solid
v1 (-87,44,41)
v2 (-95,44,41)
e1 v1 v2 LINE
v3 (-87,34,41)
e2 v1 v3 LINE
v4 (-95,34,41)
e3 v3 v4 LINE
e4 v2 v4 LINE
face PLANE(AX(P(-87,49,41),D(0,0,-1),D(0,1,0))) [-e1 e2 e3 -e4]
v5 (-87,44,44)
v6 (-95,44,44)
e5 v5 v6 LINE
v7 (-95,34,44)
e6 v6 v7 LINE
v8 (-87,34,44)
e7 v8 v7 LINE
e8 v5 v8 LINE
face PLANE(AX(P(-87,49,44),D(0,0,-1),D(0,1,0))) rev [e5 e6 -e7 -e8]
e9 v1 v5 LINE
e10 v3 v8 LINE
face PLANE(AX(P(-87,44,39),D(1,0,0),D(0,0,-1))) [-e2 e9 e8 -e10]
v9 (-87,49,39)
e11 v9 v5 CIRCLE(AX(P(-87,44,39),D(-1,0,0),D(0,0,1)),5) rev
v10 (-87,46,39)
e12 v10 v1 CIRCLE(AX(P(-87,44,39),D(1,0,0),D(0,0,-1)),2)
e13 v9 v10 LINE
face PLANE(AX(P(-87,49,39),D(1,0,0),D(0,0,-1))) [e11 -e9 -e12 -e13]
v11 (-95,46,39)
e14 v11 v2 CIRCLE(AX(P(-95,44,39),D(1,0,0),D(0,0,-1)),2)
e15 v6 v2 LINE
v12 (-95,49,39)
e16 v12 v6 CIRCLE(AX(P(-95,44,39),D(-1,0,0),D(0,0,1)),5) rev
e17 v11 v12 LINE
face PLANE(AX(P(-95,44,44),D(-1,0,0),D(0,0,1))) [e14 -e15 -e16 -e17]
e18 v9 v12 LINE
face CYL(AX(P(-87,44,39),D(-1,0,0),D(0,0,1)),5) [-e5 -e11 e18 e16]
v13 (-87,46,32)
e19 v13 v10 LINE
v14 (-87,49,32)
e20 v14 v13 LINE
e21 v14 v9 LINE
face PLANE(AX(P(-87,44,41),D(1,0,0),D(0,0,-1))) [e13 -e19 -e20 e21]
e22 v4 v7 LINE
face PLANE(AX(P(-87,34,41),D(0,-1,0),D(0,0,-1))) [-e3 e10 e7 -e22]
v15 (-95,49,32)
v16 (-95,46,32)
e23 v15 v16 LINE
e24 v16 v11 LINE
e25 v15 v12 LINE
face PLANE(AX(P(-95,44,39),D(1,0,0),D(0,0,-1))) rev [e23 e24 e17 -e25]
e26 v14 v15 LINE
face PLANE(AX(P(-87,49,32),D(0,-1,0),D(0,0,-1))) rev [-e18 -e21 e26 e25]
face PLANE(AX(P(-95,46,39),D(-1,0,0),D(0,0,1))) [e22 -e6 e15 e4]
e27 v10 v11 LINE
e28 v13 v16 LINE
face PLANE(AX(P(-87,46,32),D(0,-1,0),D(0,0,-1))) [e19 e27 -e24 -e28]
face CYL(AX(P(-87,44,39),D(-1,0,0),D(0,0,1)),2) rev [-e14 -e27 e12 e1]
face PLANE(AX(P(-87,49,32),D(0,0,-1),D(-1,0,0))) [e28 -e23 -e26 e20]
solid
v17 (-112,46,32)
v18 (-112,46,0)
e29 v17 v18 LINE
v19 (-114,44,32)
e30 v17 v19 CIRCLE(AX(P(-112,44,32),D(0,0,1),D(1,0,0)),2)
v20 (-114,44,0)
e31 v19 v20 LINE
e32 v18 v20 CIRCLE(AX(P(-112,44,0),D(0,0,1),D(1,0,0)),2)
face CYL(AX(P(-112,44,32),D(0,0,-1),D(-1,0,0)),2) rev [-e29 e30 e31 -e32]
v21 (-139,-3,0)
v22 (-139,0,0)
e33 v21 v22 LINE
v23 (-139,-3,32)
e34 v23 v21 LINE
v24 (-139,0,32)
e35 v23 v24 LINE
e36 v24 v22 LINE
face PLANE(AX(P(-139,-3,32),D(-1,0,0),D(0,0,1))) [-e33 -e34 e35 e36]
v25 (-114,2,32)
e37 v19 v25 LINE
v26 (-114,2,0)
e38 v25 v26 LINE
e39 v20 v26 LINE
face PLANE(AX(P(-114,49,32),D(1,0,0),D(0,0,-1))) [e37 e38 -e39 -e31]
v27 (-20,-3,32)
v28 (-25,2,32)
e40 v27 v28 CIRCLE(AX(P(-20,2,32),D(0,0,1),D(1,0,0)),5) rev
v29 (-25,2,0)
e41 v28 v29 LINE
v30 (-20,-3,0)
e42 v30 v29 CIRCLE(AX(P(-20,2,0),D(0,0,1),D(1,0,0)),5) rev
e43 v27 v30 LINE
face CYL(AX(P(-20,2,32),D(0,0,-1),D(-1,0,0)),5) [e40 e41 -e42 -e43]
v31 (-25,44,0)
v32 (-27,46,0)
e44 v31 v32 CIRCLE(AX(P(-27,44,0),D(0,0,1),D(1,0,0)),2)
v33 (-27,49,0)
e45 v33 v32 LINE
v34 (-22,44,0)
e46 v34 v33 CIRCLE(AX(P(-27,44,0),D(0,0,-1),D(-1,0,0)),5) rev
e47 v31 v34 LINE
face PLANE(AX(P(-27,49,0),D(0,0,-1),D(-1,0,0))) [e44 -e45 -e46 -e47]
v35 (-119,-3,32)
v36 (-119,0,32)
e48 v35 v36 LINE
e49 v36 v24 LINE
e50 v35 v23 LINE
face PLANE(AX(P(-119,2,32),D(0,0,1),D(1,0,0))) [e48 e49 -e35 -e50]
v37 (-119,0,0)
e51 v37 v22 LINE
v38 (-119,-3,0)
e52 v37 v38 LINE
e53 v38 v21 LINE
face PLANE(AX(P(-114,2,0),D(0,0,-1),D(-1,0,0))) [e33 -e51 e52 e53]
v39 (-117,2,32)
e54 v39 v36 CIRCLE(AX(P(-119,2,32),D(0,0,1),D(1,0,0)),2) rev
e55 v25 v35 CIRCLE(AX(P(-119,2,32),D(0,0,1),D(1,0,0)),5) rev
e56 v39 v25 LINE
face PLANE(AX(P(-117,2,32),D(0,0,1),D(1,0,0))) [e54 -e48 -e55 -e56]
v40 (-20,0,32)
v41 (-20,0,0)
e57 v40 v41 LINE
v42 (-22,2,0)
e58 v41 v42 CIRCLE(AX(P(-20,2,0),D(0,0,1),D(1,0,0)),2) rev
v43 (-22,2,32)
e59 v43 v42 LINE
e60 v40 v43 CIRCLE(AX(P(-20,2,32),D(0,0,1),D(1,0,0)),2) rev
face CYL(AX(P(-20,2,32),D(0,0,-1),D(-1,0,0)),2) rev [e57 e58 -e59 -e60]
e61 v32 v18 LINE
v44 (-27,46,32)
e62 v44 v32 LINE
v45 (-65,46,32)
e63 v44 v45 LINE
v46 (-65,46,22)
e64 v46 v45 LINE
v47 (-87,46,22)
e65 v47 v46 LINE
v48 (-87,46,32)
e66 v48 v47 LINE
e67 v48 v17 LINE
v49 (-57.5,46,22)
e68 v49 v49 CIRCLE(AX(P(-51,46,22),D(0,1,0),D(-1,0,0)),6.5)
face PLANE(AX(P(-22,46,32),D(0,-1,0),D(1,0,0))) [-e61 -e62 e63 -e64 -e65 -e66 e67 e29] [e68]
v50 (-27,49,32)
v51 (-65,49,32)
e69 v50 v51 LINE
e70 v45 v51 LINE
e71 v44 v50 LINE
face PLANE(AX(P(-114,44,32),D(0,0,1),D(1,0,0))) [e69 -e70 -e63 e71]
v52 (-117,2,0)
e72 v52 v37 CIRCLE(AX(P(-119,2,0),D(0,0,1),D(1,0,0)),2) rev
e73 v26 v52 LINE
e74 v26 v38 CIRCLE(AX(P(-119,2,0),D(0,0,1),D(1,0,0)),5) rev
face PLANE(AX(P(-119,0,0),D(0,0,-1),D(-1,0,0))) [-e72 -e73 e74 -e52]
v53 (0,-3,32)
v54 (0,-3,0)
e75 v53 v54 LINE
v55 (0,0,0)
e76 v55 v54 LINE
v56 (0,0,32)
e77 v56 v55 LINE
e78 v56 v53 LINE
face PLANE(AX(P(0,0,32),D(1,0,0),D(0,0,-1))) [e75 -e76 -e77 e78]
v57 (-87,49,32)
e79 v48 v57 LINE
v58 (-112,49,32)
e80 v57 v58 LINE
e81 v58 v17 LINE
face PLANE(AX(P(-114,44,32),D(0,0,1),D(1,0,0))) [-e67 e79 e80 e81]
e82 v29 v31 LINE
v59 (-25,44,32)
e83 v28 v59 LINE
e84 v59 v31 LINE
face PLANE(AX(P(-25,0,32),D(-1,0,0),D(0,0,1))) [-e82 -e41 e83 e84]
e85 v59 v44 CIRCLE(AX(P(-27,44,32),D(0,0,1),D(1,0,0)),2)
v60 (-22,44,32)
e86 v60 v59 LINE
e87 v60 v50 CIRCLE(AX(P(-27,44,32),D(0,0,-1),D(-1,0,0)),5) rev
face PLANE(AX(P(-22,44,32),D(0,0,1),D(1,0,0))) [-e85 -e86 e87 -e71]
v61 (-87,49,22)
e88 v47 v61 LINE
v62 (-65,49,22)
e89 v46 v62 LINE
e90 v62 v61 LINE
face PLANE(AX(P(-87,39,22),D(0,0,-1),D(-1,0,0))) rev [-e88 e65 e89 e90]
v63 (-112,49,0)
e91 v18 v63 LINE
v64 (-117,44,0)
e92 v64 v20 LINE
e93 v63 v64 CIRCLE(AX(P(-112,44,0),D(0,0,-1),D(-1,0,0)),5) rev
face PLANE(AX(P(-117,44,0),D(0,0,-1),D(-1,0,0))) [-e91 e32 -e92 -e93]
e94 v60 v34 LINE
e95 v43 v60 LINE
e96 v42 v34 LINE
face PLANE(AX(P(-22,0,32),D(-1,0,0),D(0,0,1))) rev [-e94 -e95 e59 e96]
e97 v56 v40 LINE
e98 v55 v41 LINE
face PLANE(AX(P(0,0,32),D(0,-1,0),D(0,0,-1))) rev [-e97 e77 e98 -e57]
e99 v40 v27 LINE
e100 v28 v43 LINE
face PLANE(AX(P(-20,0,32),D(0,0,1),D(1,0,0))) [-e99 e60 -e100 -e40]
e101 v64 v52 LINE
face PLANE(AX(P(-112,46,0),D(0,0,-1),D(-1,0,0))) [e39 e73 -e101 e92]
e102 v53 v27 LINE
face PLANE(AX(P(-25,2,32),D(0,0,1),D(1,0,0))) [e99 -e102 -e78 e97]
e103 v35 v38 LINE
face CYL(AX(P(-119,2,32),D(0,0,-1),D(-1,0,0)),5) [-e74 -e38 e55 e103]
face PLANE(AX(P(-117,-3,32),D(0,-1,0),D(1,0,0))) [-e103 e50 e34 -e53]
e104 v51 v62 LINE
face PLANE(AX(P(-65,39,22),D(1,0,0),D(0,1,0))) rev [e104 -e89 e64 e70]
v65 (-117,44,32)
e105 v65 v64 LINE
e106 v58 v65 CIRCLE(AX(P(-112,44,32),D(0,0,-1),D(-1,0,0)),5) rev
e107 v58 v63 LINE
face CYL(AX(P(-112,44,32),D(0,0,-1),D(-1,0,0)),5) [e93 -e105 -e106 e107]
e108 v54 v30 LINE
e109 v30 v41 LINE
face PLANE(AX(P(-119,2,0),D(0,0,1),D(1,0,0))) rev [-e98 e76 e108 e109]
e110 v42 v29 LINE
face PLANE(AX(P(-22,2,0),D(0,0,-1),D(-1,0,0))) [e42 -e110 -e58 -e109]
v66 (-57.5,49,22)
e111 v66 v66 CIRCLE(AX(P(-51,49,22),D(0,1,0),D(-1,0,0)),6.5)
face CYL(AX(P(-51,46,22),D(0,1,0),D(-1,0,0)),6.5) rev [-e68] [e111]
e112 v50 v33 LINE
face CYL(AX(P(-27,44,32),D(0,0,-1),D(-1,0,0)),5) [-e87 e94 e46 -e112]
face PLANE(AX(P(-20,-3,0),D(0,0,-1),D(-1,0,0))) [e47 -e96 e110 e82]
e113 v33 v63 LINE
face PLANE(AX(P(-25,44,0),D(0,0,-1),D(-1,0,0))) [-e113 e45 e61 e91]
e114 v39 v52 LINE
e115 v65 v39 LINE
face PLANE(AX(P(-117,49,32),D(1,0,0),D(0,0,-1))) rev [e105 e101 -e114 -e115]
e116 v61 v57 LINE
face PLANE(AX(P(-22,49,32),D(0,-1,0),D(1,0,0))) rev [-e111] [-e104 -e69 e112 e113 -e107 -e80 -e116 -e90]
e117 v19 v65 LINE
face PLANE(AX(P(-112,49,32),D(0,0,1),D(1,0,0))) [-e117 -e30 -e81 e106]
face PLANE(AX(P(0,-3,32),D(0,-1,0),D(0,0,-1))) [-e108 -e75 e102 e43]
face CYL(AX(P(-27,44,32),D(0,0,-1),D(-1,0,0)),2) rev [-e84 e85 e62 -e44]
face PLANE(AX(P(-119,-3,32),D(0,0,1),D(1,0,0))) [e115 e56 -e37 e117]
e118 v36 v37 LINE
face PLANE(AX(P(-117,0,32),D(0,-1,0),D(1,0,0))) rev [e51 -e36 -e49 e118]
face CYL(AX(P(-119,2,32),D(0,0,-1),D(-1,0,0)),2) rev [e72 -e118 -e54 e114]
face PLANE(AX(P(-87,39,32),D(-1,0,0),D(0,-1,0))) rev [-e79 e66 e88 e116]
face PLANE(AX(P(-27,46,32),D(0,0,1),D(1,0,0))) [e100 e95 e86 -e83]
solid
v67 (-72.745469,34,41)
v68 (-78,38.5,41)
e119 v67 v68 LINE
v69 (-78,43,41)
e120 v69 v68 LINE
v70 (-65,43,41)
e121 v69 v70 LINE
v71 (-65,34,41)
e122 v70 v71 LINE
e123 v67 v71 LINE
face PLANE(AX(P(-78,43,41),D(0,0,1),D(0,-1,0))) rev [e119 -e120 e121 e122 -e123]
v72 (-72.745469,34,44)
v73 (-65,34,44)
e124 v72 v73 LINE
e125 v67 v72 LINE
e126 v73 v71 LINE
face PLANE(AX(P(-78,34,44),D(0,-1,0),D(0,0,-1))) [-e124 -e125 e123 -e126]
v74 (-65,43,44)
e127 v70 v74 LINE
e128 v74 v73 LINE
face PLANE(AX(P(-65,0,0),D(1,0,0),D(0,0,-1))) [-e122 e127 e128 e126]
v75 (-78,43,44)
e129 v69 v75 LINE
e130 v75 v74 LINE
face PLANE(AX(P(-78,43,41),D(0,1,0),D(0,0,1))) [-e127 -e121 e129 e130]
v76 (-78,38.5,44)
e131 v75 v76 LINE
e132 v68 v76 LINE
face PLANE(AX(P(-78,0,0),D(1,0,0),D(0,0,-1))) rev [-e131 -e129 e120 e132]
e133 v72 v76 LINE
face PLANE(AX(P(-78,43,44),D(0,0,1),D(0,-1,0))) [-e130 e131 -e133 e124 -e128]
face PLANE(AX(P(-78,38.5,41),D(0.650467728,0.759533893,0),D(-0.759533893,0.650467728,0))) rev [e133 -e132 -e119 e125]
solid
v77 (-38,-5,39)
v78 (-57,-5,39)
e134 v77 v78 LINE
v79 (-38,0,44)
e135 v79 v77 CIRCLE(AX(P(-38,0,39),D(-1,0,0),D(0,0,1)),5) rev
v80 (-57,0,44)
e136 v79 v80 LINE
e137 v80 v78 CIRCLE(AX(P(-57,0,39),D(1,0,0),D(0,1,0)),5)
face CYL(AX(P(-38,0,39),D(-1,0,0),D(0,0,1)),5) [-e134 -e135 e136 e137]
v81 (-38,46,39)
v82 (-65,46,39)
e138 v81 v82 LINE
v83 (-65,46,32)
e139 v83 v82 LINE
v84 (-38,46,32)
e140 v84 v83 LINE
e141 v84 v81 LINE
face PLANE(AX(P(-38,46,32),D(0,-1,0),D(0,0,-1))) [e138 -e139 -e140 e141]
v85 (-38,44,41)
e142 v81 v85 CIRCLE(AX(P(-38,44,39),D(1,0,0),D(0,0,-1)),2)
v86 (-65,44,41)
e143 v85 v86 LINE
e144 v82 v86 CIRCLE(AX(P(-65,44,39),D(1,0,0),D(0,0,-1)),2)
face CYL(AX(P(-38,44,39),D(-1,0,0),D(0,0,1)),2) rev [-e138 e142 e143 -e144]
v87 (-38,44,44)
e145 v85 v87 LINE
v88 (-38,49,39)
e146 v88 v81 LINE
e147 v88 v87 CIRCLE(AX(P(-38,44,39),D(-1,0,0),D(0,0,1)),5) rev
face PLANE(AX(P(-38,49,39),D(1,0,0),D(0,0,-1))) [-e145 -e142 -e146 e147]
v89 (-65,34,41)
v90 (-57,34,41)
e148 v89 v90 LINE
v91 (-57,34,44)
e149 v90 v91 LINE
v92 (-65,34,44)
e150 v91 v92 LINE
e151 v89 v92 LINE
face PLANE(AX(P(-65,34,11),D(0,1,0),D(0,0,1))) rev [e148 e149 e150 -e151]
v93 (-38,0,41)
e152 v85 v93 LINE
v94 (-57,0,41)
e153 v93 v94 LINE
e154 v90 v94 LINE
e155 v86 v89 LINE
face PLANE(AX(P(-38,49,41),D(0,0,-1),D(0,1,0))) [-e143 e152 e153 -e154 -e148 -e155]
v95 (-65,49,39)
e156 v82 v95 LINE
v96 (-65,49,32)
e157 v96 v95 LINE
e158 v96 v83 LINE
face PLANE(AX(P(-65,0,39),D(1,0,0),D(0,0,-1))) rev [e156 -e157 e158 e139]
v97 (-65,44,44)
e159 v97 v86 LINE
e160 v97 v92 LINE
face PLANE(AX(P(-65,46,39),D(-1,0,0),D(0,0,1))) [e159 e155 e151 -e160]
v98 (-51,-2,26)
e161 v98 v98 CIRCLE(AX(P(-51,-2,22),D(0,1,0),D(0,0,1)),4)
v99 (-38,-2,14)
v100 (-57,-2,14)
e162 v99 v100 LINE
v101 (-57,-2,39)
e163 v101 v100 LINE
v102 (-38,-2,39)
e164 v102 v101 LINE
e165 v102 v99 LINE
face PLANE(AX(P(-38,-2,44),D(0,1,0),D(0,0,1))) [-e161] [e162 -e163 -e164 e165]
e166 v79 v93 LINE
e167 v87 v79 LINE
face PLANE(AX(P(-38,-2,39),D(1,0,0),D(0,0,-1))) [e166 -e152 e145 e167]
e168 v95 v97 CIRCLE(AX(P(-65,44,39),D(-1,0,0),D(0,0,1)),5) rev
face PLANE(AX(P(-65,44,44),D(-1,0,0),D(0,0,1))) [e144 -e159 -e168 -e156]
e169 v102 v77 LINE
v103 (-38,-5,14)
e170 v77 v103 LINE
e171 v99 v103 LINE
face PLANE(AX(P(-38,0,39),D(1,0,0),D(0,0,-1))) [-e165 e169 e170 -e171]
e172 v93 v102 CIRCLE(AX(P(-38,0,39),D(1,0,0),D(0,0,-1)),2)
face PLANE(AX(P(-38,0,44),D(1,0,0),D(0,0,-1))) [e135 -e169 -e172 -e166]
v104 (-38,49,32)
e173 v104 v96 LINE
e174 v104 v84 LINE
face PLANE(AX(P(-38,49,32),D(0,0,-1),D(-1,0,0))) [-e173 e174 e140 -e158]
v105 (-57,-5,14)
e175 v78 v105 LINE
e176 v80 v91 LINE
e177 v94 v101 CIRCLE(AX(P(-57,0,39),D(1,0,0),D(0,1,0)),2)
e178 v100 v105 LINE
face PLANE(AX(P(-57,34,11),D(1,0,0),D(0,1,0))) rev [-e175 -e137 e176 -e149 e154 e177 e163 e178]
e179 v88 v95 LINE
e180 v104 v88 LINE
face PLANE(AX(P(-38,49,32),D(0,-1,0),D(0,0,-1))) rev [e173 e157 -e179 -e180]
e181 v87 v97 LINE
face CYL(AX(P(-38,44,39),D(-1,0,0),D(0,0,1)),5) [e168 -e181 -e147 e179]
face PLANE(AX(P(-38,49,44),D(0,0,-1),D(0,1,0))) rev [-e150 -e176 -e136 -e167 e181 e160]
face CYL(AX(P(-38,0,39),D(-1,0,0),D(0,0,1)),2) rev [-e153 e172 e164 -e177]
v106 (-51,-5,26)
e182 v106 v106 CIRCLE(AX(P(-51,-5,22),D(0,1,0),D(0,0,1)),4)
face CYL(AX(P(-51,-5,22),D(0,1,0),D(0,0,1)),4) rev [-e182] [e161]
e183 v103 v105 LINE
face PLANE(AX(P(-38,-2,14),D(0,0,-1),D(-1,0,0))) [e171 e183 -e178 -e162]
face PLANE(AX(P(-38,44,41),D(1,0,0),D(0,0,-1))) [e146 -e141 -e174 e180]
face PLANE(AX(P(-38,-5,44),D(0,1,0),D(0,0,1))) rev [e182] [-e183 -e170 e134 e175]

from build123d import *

# Parameters (mm, degrees)
BRIDA_BASE1_DEPTH     = 32
BRIDA_BASE2_DEPTH     = 8
CROQUIS9_W            = 22
CROQUIS9_H            = 10
CORTAR_EXTRUIR1_DEPTH = 10
CORTAR_EXTRUIR2_DEPTH = 3
BRIDA_BASE6_DEPTH     = 27
CROQUIS29_W           = 8
CROQUIS29_H           = 40
CORTAR_EXTRUIR7_DEPTH = 33
CROQUIS30_W           = 3
CROQUIS30_H           = 9
BRIDA_BASE7_DEPTH     = 13
CORTAR_EXTRUIR8_DEPTH = 3
CROQUIS34_R           = 4
CORTAR_EXTRUIR9_DEPTH = 3


# Sheet-metal steps are written as plain solids
with BuildPart() as part:
    # Croquis1 → Brida base1 (new body)
    with BuildSketch(Plane.XY):
        with BuildLine():
            Line((0, 0), (-20, 0))
            ThreePointArc((-20, 0), (-21.414213562, 0.585786438), (-22, 2))
            Line((-22, 2), (-22, 44))
            ThreePointArc((-22, 44), (-23.464466094, 47.535533906), (-27, 49))
            Line((-27, 49), (-112, 49))
            ThreePointArc((-112, 49), (-115.535533906, 47.535533906), (-117, 44))
            Line((-117, 44), (-117, 2))
            ThreePointArc((-117, 2), (-117.585786438, 0.585786438), (-119, 0))
            Line((-119, 0), (-139, 0))
            Line((-139, 0), (-139, -3))
            Line((-139, -3), (-119, -3))
            ThreePointArc((-119, -3), (-115.464466094, -1.535533906), (-114, 2))
            Line((-114, 2), (-114, 44))
            ThreePointArc((-114, 44), (-113.414213562, 45.414213562), (-112, 46))
            Line((-112, 46), (-27, 46))
            ThreePointArc((-27, 46), (-25.585786438, 45.414213562), (-25, 44))
            Line((-25, 44), (-25, 2))
            ThreePointArc((-25, 2), (-23.535533906, -1.535533906), (-20, -3))
            Line((-20, -3), (0, -3))
            Line((0, -3), (0, 0))
        make_face()
    extrude(amount=BRIDA_BASE1_DEPTH)

    # Croquis9 → Cortar-Extruir1 (cut)
    with BuildSketch(Plane(origin=(0, 49, 0), x_dir=(1, 0, 0), z_dir=(0, 1, 0))):
        with Locations((-76, -27)):
            Rectangle(CROQUIS9_W, CROQUIS9_H)
    extrude(amount=-CORTAR_EXTRUIR1_DEPTH, mode=Mode.SUBTRACT)

    # Croquis19 → Cortar-Extruir2 (cut)
    with BuildSketch(Plane(origin=(0, 49, 0), x_dir=(1, 0, 0), z_dir=(0, 1, 0))):
        with BuildLine():
            ThreePointArc((-51, -15.5), (-55.596194078, -26.596194078), (-44.5, -22))
            Line((-44.5, -22), (-51, -22))
            Line((-51, -22), (-51, -15.5))
        make_face()
        with BuildLine():
            Line((-51, -22), (-44.5, -22))
            ThreePointArc((-44.5, -22), (-46.403805922, -17.403805922), (-51, -15.5))
            Line((-51, -15.5), (-51, -22))
        make_face()
    extrude(amount=-CORTAR_EXTRUIR2_DEPTH, mode=Mode.SUBTRACT)


with BuildPart() as body_2:
    # Croquis6 → Brida base2 (new body)
    with BuildSketch(Plane(origin=(-95, 0, 0), x_dir=(0, 0, -1), z_dir=(1, 0, 0))):
        with BuildLine():
            Line((-32, 49), (-39, 49))
            ThreePointArc((-39, 49), (-42.535533906, 47.535533906), (-44, 44))
            Line((-44, 44), (-44, 34))
            Line((-44, 34), (-41, 34))
            Line((-41, 34), (-41, 44))
            ThreePointArc((-41, 44), (-40.414213562, 45.414213562), (-39, 46))
            Line((-39, 46), (-32, 46))
            Line((-32, 46), (-32, 49))
        make_face()
    extrude(amount=BRIDA_BASE2_DEPTH)


with BuildPart() as body_3:
    # Croquis26 → Brida base6 (new body)
    with BuildSketch(Plane(origin=(-65, 0, 0), x_dir=(0, 0, -1), z_dir=(1, 0, 0))):
        with BuildLine():
            Line((-32, 49), (-39, 49))
            ThreePointArc((-39, 49), (-42.535533906, 47.535533906), (-44, 44))
            Line((-44, 44), (-44, 0))
            ThreePointArc((-44, 0), (-42.535533906, -3.535533906), (-39, -5))
            Line((-39, -5), (-14, -5))
            Line((-14, -5), (-14, -2))
            Line((-14, -2), (-39, -2))
            ThreePointArc((-39, -2), (-40.414213562, -1.414213562), (-41, 0))
            Line((-41, 0), (-41, 44))
            ThreePointArc((-41, 44), (-40.414213562, 45.414213562), (-39, 46))
            Line((-39, 46), (-32, 46))
            Line((-32, 46), (-32, 49))
        make_face()
    extrude(amount=BRIDA_BASE6_DEPTH)

    # Croquis29 → Cortar-Extruir7 (cut)
    with BuildSketch(Plane.XY.offset(44)):
        with Locations((-61, 14)):
            Rectangle(CROQUIS29_W, CROQUIS29_H)
    extrude(amount=-CORTAR_EXTRUIR7_DEPTH, mode=Mode.SUBTRACT)

    # Croquis34 → Cortar-Extruir9 (cut)
    with BuildSketch(Plane(origin=(0, -2, 0), x_dir=(1, 0, 0), z_dir=(0, 1, 0))):
        with Locations(Location((-51, -22, 0), (0, 0, 270))):
            Circle(CROQUIS34_R)
    extrude(amount=-CORTAR_EXTRUIR9_DEPTH, mode=Mode.SUBTRACT)


with BuildPart() as body_4:
    # Croquis30 → Brida base7 (new body)
    with BuildSketch(Plane.ZY.offset(65)):
        with Locations((42.5, 38.5)):
            Rectangle(CROQUIS30_W, CROQUIS30_H)
    extrude(amount=BRIDA_BASE7_DEPTH)

    # Croquis33 → Cortar-Extruir8 (cut)
    with BuildSketch(Plane.XY.offset(44)):
        Polygon((-78, 38.5), (-72.745469491, 34), (-78, 34), align=None)
    extrude(amount=-CORTAR_EXTRUIR8_DEPTH, mode=Mode.SUBTRACT)


solid = Compound([part.part, body_2.part, body_3.part, body_4.part])
